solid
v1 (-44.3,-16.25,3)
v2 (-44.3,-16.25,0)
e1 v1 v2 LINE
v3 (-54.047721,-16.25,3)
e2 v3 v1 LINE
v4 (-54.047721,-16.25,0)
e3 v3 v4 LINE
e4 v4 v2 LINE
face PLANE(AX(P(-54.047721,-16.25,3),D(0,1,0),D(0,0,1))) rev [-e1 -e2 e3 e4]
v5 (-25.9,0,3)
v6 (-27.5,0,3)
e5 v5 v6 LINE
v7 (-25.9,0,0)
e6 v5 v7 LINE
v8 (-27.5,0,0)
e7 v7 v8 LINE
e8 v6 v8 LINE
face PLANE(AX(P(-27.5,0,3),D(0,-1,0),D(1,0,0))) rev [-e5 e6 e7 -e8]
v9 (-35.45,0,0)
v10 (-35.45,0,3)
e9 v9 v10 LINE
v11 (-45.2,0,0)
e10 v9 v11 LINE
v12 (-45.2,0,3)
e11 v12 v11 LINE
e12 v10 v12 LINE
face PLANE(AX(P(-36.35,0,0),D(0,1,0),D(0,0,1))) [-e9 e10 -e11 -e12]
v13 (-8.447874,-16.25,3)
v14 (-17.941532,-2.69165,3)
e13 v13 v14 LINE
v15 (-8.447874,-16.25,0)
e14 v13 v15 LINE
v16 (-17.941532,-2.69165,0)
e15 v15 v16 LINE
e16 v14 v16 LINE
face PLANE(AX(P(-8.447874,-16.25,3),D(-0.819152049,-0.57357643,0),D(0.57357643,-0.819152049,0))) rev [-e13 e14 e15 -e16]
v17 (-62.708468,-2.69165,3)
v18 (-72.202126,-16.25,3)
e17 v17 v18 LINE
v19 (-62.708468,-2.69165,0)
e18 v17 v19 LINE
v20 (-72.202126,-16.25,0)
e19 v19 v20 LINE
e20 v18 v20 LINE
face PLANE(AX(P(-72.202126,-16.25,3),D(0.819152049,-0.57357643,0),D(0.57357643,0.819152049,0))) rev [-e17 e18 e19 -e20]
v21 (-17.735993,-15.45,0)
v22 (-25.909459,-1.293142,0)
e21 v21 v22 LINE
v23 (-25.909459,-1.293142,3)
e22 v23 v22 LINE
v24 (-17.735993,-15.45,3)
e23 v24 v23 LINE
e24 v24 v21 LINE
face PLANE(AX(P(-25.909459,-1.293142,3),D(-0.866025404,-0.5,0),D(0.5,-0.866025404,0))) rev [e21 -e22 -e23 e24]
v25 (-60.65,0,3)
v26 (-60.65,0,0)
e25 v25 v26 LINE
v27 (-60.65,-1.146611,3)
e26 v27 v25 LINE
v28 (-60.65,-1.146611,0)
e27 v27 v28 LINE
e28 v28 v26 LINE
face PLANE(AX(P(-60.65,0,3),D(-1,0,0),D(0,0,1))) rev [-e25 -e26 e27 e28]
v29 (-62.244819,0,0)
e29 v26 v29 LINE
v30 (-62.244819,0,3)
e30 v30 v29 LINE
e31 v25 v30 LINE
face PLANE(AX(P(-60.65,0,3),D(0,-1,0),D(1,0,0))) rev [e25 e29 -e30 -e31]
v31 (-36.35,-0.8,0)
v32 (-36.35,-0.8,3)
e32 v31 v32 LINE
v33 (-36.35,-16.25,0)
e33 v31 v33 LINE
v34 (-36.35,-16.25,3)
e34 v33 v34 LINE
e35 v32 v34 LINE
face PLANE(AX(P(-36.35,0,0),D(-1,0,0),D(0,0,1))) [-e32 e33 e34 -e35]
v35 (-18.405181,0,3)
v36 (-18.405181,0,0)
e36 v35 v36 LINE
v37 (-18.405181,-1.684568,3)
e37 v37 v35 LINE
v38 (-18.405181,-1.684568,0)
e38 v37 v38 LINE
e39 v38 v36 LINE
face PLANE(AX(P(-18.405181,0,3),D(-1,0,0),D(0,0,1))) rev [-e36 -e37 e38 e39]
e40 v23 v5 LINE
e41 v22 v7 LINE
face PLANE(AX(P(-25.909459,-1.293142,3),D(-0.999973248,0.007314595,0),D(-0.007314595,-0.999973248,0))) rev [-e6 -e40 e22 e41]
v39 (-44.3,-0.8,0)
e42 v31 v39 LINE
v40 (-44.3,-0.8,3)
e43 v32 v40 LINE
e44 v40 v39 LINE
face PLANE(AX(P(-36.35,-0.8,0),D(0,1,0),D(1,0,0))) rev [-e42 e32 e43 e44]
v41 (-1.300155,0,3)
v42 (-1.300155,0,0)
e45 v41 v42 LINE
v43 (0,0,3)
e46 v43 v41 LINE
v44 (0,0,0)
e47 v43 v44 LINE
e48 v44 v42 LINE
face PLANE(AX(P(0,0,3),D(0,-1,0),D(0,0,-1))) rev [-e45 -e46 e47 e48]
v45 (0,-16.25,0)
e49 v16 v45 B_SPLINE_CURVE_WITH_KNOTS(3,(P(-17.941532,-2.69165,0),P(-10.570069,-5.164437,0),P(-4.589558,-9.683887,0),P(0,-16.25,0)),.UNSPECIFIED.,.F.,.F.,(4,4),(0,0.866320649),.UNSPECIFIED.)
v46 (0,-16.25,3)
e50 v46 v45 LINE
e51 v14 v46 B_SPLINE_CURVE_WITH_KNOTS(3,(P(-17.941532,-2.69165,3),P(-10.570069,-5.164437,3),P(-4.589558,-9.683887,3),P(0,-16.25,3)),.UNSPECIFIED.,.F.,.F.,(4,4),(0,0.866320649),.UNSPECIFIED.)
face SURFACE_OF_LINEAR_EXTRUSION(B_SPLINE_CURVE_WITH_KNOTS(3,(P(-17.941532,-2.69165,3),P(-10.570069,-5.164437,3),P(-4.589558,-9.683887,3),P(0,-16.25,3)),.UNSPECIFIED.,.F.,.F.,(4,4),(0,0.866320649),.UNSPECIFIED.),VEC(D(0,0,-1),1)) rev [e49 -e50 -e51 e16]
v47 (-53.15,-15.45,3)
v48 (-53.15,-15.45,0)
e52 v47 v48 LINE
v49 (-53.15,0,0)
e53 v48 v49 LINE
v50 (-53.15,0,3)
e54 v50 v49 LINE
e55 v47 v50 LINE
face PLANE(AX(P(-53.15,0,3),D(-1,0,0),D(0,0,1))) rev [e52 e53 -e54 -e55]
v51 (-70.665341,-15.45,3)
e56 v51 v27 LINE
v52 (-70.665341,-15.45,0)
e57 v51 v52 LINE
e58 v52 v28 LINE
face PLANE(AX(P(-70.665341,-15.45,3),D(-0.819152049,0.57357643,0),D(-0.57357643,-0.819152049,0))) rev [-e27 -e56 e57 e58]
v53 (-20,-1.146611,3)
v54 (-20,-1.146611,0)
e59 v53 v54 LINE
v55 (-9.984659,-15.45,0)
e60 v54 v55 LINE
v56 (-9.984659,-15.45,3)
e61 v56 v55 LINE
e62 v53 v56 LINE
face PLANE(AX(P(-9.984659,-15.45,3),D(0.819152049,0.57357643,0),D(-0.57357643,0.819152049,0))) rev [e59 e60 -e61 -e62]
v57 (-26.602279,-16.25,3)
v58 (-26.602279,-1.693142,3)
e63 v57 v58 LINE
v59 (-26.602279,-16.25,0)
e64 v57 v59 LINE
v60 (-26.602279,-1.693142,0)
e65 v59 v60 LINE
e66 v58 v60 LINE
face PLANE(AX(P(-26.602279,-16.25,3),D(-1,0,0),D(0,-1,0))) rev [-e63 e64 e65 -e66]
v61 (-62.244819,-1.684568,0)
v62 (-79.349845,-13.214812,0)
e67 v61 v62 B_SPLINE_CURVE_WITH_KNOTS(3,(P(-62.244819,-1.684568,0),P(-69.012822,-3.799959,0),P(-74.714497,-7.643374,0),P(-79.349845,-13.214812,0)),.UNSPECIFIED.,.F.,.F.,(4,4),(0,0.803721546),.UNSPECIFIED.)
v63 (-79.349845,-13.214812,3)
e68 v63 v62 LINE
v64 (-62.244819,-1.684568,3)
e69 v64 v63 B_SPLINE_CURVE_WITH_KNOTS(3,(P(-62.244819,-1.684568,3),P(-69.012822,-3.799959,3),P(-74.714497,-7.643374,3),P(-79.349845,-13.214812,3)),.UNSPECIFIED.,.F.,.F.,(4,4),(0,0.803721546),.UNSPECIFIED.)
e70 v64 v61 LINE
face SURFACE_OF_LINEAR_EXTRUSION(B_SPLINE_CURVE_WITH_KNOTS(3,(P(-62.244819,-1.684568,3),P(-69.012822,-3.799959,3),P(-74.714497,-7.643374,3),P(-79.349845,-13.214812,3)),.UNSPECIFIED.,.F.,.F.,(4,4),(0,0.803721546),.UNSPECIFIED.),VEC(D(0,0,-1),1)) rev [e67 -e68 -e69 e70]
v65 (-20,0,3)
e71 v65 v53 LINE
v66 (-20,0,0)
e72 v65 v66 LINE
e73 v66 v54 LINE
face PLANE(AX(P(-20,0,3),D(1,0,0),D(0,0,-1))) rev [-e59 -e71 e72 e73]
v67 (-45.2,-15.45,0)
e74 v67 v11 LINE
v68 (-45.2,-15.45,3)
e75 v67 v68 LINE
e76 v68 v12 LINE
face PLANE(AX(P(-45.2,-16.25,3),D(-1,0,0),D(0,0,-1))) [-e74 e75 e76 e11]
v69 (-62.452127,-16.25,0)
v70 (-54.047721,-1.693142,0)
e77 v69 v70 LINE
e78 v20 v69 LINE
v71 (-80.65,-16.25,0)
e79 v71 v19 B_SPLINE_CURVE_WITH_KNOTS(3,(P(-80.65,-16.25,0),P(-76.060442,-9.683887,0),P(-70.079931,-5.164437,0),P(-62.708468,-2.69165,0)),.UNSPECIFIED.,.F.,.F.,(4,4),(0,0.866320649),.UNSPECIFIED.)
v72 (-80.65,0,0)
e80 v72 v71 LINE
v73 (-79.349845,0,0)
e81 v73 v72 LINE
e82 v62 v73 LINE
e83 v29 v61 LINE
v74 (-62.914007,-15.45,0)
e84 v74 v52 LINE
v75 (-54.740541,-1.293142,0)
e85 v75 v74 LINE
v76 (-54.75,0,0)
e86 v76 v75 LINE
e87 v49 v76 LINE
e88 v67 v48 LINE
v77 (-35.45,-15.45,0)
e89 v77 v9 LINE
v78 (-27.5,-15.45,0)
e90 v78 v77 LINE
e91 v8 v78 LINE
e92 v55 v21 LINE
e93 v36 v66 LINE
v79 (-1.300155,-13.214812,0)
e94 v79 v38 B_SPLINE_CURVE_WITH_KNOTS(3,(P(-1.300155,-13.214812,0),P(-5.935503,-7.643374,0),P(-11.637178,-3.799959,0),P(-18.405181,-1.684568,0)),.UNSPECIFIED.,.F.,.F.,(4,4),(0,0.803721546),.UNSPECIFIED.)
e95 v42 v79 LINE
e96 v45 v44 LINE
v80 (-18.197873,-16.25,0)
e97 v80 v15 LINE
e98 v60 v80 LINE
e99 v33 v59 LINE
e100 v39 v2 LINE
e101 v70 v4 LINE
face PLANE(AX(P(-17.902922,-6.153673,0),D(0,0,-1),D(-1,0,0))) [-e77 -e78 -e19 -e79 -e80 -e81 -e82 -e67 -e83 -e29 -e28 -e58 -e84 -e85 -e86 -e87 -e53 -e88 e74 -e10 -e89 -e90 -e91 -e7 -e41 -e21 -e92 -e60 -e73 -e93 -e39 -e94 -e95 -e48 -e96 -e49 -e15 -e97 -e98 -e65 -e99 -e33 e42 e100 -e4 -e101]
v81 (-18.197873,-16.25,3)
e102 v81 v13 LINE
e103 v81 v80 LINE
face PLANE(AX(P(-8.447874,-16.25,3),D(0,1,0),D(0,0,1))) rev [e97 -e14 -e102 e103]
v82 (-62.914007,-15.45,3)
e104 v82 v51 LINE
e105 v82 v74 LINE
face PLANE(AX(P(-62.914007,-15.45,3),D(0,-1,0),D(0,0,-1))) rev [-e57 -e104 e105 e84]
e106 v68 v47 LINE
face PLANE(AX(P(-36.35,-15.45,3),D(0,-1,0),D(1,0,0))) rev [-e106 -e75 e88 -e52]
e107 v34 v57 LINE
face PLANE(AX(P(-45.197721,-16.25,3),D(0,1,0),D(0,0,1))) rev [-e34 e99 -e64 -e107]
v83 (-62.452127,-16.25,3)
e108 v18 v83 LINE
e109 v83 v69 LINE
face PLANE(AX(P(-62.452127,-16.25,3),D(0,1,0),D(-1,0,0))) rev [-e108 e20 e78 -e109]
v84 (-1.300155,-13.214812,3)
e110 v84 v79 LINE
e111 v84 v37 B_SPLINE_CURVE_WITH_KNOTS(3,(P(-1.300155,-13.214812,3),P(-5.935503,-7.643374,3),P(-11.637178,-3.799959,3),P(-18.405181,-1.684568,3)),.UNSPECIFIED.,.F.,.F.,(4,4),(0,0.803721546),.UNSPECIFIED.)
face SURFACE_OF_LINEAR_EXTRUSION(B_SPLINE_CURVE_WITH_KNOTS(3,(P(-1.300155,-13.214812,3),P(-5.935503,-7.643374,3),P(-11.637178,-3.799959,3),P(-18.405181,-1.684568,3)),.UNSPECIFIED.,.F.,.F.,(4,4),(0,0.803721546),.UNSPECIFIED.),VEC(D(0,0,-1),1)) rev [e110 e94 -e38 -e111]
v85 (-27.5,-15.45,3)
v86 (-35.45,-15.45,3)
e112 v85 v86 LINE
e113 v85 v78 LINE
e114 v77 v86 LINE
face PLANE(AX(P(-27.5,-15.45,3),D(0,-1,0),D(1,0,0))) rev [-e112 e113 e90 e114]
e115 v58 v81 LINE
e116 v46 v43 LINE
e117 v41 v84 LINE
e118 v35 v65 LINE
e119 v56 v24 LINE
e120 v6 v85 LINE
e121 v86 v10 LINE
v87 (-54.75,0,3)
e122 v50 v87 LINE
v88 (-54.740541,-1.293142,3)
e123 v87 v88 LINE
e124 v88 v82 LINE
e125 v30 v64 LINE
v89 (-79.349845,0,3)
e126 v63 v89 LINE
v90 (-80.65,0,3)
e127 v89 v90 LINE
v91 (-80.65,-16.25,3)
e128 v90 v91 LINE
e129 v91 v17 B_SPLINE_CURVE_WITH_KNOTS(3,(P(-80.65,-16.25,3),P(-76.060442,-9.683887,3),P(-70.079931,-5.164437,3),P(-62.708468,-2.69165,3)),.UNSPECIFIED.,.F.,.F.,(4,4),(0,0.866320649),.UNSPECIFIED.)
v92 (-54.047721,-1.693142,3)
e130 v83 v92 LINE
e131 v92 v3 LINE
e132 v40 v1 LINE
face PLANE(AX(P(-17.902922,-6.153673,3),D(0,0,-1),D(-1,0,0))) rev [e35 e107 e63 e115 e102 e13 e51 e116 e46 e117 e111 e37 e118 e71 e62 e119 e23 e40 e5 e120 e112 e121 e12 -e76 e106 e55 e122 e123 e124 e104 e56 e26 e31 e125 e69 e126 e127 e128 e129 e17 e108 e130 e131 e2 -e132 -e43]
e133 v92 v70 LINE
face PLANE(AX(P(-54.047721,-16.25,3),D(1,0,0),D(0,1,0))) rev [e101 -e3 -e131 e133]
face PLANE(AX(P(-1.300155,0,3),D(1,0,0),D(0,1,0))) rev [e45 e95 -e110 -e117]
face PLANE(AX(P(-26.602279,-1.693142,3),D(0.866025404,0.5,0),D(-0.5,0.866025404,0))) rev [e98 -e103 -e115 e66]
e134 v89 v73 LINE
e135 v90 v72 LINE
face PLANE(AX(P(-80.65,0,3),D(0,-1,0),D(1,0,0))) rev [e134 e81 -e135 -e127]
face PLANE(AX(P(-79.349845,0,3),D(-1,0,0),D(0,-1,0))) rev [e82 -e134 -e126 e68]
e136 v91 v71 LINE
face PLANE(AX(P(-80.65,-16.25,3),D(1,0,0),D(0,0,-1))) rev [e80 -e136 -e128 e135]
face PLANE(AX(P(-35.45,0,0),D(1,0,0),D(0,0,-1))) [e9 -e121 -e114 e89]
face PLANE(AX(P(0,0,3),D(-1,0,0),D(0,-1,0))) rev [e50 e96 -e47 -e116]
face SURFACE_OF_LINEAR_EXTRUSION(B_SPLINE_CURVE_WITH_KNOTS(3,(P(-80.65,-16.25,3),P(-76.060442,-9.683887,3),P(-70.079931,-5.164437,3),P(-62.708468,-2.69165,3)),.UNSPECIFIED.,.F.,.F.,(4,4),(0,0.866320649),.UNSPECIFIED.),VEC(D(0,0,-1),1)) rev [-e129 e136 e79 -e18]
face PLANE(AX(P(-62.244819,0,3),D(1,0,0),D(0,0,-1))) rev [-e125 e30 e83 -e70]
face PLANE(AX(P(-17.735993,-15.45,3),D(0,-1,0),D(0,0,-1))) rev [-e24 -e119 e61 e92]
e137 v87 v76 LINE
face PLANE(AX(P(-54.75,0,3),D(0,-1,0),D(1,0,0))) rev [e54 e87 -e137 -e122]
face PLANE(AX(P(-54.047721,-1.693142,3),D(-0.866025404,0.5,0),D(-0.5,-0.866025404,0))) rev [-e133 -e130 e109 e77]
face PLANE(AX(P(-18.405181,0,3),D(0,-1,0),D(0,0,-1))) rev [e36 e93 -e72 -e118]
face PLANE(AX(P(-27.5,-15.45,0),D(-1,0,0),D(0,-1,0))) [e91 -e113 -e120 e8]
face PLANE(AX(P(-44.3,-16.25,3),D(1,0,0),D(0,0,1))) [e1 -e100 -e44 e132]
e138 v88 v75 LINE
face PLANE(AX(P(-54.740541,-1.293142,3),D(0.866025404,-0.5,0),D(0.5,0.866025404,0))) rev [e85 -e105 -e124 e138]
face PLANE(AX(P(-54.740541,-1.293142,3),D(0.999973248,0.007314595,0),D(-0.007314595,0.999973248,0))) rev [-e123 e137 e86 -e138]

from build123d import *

# Parameters (mm, degrees)
BOSS_EXTRUDE1_DEPTH    = 3
SKETCH2_W              = 0.9
SKETCH2_H              = 15.45
BOSS_EXTRUDE2_DEPTH    = 3
SPLIT1_DEPTH           = 3
SPLIT1_START           = -36.35
SPLIT1_2_OUTLINE_W     = 16.25
SPLIT1_2_OUTLINE_H     = 3
SPLIT1_2_DEPTH         = 0.9
SPLIT1_START_2         = -35.45
SPLIT1_3_OUTLINE_W     = 0.8
SPLIT1_3_OUTLINE_H     = 3
SPLIT1_3_DEPTH         = 7.95
SPLIT1_4_DEPTH         = 3
BODY_MOVE_COPY13_ANGLE = 180
BODY_MOVE_COPY17_ANGLE = 180


# Read off the part's stored shape, not the designer's step: Split1
with BuildPart() as part:
    # Sketch1 → Boss-Extrude1 (new body)
    with BuildSketch(Plane(origin=(0, 0, 0), x_dir=(0, 1, 0), z_dir=(0, 0, 1))):
        with BuildLine():
            Line((0, 0), (-16.25, 0))
            add(Edge.make_bspline(
                [(-16.25, 0), (-9.683887405, 4.589558491), (-5.164437434, 10.570069252), (-2.691650088, 17.941532282)],
                knots=[0, 0, 0, 0, 0.866320649, 0.866320649, 0.866320649, 0.866320649], degree=3))
            Line((-2.691650088, 17.941532282), (-16.25, 8.447873633))
            Line((-16.25, 8.447873633), (-16.25, 18.197873462))
            Line((-16.25, 18.197873462), (-1.693141934, 26.602279385))
            Line((-1.693141934, 26.602279385), (-16.25, 26.602279385))
            Line((-16.25, 26.602279385), (-16.25, 45.197720615))
            Line((-16.25, 45.197720615), (-1.693141934, 45.197720615))
            Line((-1.693141934, 45.197720615), (-16.25, 53.602126538))
            Line((-16.25, 53.602126538), (-16.25, 63.352126367))
            Line((-16.25, 63.352126367), (-2.691650088, 53.858467718))
            add(Edge.make_bspline(
                [(-16.25, 71.8), (-9.683887405, 67.210441509), (-5.164437434, 61.229930748), (-2.691650088, 53.858467718)],
                knots=[0, 0, 0, 0, 0.866320649, 0.866320649, 0.866320649, 0.866320649], degree=3))
            Line((-16.25, 71.8), (0, 71.8))
            Line((0, 71.8), (0, 70.499844847))
            Line((0, 70.499844847), (-13.214812034, 70.499844847))
            add(Edge.make_bspline(
                [(-13.214812034, 70.499844847), (-7.643374044, 65.864497023), (-3.799959359, 60.162821742), (-1.68456798, 53.394819004)],
                knots=[0, 0, 0, 0, 0.803721546, 0.803721546, 0.803721546, 0.803721546], degree=3))
            Line((-1.68456798, 53.394819004), (0, 53.394819004))
            Line((0, 53.394819004), (0, 51.800000008))
            Line((0, 51.800000008), (-1.146610933, 51.800000008))
            Line((-1.146610933, 51.800000008), (-15.450000067, 61.815340728))
            Line((-15.450000067, 61.815340728), (-15.450000067, 54.064006792))
            Line((-15.450000067, 54.064006792), (-1.293141934, 45.890540938))
            Line((-1.293141934, 45.890540938), (0, 45.9))
            Line((0, 45.9), (0, 44.3))
            Line((0, 44.3), (-15.45, 44.3))
            Line((-15.45, 44.3), (-15.45, 27.5))
            Line((-15.45, 27.5), (0, 27.5))
            Line((0, 27.5), (0, 25.9))
            Line((0, 25.9), (-1.293141934, 25.909459062))
            Line((-1.293141934, 25.909459062), (-15.450000067, 17.735993208))
            Line((-15.450000067, 17.735993208), (-15.450000067, 9.984659272))
            Line((-15.450000067, 9.984659272), (-1.146610933, 19.999999992))
            Line((-1.146610933, 19.999999992), (0, 19.999999992))
            Line((0, 19.999999992), (0, 18.405180996))
            Line((0, 18.405180996), (-1.68456798, 18.405180996))
            add(Edge.make_bspline(
                [(-13.214812034, 1.300155153), (-7.643374044, 5.935502977), (-3.799959359, 11.637178258), (-1.68456798, 18.405180996)],
                knots=[0, 0, 0, 0, 0.803721546, 0.803721546, 0.803721546, 0.803721546], degree=3))
            Line((-13.214812034, 1.300155153), (0, 1.300155153))
            Line((0, 1.300155153), (0, 0))
        make_face()
    extrude(amount=BOSS_EXTRUDE1_DEPTH)

    # Sketch2 → Boss-Extrude2 (add)
    with BuildSketch(Plane.XY.offset(3)):
        with Locations((-35.9, -7.725)):
            Rectangle(SKETCH2_W, SKETCH2_H)
    extrude(amount=-BOSS_EXTRUDE2_DEPTH)

    # Split1 outline → Split1 (cut)
    with BuildSketch(Plane.XY):
        with BuildLine():
            Line((-53.394819004, 0), (-53.394819004, -1.68456798))
            add(Edge.make_bspline(
                [(-53.394819004, -1.68456798), (-60.162821742, -3.799959359), (-65.864497023, -7.643374044), (-70.499844847, -13.214812034)],
                knots=[0, 0, 0, 0, 0.803721546, 0.803721546, 0.803721546, 0.803721546], degree=3))
            Line((-70.499844847, -13.214812034), (-70.499844847, 0))
            Line((-70.499844847, 0), (-71.8, 0))
            Line((-71.8, 0), (-71.8, -16.25))
            add(Edge.make_bspline(
                [(-71.8, -16.25), (-67.210441509, -9.683887405), (-61.229930748, -5.164437434), (-53.858467718, -2.691650088)],
                knots=[0, 0, 0, 0, 0.866320649, 0.866320649, 0.866320649, 0.866320649], degree=3))
            Line((-53.858467718, -2.691650088), (-63.352126367, -16.25))
            Line((-63.352126367, -16.25), (-53.602126538, -16.25))
            Line((-53.602126538, -16.25), (-45.197720615, -1.693141934))
            Line((-45.197720615, -1.693141934), (-45.197720615, -16.25))
            Line((-45.197720615, -16.25), (-27.5, -16.25))
            Line((-27.5, -16.25), (-27.5, -15.45))
            Line((-27.5, -15.45), (-35.45, -15.45))
            Line((-35.45, -15.45), (-35.45, 0))
            Line((-35.45, 0), (-36.35, 0))
            Line((-36.35, 0), (-36.35, -15.45))
            Line((-36.35, -15.45), (-44.3, -15.45))
            Line((-44.3, -15.45), (-44.3, 0))
            Line((-44.3, 0), (-45.9, 0))
            Line((-45.9, 0), (-45.890540938, -1.293141934))
            Line((-45.890540938, -1.293141934), (-54.064006792, -15.450000067))
            Line((-54.064006792, -15.450000067), (-61.815340728, -15.450000067))
            Line((-61.815340728, -15.450000067), (-51.800000008, -1.146610933))
            Line((-51.800000008, -1.146610933), (-51.800000008, 0))
            Line((-51.800000008, 0), (-53.394819004, 0))
        make_face()
    extrude(amount=SPLIT1_DEPTH, mode=Mode.SUBTRACT)


with BuildPart() as body_2:
    # Split1 2 outline → Split1 2 (new body)
    with BuildSketch(Plane.YZ.offset(SPLIT1_START)):
        with Locations((-8.125, 1.5)):
            Rectangle(SPLIT1_2_OUTLINE_W, SPLIT1_2_OUTLINE_H)
    extrude(amount=SPLIT1_2_DEPTH)

    # Split1 3 outline → Split1 3 (add)
    with BuildSketch(Plane.YZ.offset(SPLIT1_START_2)):
        with Locations((-15.85, 1.5)):
            Rectangle(SPLIT1_3_OUTLINE_W, SPLIT1_3_OUTLINE_H)
    extrude(amount=SPLIT1_3_DEPTH)


with BuildPart() as body_3:
    # Split1 4 outline → Split1 4 (new body)
    with BuildSketch(Plane.XY):
        with BuildLine():
            Line((-36.35, -16.25), (-36.35, -15.45))
            Line((-36.35, -15.45), (-44.3, -15.45))
            Line((-44.3, -15.45), (-44.3, 0))
            Line((-44.3, 0), (-45.9, 0))
            Line((-45.9, 0), (-45.890540938, -1.293141934))
            Line((-45.890540938, -1.293141934), (-54.064006792, -15.450000067))
            Line((-54.064006792, -15.450000067), (-61.815340728, -15.450000067))
            Line((-61.815340728, -15.450000067), (-51.800000008, -1.146610933))
            Line((-51.800000008, -1.146610933), (-51.800000008, 0))
            Line((-51.800000008, 0), (-53.394819004, 0))
            Line((-53.394819004, 0), (-53.394819004, -1.68456798))
            add(Edge.make_bspline(
                [(-53.394819004, -1.68456798), (-60.162821742, -3.799959359), (-65.864497023, -7.643374044), (-70.499844847, -13.214812034)],
                knots=[0, 0, 0, 0, 0.803721546, 0.803721546, 0.803721546, 0.803721546], degree=3))
            Line((-70.499844847, -13.214812034), (-70.499844847, 0))
            Line((-70.499844847, 0), (-71.8, 0))
            Line((-71.8, 0), (-71.8, -16.25))
            add(Edge.make_bspline(
                [(-71.8, -16.25), (-67.210441509, -9.683887405), (-61.229930748, -5.164437434), (-53.858467718, -2.691650088)],
                knots=[0, 0, 0, 0, 0.866320649, 0.866320649, 0.866320649, 0.866320649], degree=3))
            Line((-53.858467718, -2.691650088), (-63.352126367, -16.25))
            Line((-63.352126367, -16.25), (-53.602126538, -16.25))
            Line((-53.602126538, -16.25), (-45.197720615, -1.693141934))
            Line((-45.197720615, -1.693141934), (-45.197720615, -16.25))
            Line((-45.197720615, -16.25), (-36.35, -16.25))
        make_face()
    extrude(amount=SPLIT1_4_DEPTH)


with BuildPart() as body_3_1:
    # Body-Move/Copy11: moved
    add(body_3.part.moved(Location((-8.85, 0, 0))))


with BuildPart() as body_2_1:
    # Body-Move/Copy12: moved
    add(body_2.part.moved(Location((-8.85, 0, 0))))


with BuildPart() as body_2_2:
    # Body-Move/Copy13: moved
    add(body_2_1.part.rotate(Axis((0, -8.125, 1.5), (1, 0, 0)), BODY_MOVE_COPY13_ANGLE))


with BuildPart() as body_4:
    # Body-Move/Copy14: copy of body 2
    add(body_2_2.part.moved(Location((8.85, 0, 0))))


with BuildPart() as body_4_1:
    # Body-Move/Copy17: moved
    add(body_4.part.rotate(Axis((0, -8.125, 1.5), (1, 0, 0)), BODY_MOVE_COPY17_ANGLE))


with BuildPart() as body_3_2:
    add(body_3_1.part)

    # Combine1: union body 4, body 2, part
    add(body_4_1.part)
    add(body_2_2.part)
    add(part.part)


solid = body_3_2.part
